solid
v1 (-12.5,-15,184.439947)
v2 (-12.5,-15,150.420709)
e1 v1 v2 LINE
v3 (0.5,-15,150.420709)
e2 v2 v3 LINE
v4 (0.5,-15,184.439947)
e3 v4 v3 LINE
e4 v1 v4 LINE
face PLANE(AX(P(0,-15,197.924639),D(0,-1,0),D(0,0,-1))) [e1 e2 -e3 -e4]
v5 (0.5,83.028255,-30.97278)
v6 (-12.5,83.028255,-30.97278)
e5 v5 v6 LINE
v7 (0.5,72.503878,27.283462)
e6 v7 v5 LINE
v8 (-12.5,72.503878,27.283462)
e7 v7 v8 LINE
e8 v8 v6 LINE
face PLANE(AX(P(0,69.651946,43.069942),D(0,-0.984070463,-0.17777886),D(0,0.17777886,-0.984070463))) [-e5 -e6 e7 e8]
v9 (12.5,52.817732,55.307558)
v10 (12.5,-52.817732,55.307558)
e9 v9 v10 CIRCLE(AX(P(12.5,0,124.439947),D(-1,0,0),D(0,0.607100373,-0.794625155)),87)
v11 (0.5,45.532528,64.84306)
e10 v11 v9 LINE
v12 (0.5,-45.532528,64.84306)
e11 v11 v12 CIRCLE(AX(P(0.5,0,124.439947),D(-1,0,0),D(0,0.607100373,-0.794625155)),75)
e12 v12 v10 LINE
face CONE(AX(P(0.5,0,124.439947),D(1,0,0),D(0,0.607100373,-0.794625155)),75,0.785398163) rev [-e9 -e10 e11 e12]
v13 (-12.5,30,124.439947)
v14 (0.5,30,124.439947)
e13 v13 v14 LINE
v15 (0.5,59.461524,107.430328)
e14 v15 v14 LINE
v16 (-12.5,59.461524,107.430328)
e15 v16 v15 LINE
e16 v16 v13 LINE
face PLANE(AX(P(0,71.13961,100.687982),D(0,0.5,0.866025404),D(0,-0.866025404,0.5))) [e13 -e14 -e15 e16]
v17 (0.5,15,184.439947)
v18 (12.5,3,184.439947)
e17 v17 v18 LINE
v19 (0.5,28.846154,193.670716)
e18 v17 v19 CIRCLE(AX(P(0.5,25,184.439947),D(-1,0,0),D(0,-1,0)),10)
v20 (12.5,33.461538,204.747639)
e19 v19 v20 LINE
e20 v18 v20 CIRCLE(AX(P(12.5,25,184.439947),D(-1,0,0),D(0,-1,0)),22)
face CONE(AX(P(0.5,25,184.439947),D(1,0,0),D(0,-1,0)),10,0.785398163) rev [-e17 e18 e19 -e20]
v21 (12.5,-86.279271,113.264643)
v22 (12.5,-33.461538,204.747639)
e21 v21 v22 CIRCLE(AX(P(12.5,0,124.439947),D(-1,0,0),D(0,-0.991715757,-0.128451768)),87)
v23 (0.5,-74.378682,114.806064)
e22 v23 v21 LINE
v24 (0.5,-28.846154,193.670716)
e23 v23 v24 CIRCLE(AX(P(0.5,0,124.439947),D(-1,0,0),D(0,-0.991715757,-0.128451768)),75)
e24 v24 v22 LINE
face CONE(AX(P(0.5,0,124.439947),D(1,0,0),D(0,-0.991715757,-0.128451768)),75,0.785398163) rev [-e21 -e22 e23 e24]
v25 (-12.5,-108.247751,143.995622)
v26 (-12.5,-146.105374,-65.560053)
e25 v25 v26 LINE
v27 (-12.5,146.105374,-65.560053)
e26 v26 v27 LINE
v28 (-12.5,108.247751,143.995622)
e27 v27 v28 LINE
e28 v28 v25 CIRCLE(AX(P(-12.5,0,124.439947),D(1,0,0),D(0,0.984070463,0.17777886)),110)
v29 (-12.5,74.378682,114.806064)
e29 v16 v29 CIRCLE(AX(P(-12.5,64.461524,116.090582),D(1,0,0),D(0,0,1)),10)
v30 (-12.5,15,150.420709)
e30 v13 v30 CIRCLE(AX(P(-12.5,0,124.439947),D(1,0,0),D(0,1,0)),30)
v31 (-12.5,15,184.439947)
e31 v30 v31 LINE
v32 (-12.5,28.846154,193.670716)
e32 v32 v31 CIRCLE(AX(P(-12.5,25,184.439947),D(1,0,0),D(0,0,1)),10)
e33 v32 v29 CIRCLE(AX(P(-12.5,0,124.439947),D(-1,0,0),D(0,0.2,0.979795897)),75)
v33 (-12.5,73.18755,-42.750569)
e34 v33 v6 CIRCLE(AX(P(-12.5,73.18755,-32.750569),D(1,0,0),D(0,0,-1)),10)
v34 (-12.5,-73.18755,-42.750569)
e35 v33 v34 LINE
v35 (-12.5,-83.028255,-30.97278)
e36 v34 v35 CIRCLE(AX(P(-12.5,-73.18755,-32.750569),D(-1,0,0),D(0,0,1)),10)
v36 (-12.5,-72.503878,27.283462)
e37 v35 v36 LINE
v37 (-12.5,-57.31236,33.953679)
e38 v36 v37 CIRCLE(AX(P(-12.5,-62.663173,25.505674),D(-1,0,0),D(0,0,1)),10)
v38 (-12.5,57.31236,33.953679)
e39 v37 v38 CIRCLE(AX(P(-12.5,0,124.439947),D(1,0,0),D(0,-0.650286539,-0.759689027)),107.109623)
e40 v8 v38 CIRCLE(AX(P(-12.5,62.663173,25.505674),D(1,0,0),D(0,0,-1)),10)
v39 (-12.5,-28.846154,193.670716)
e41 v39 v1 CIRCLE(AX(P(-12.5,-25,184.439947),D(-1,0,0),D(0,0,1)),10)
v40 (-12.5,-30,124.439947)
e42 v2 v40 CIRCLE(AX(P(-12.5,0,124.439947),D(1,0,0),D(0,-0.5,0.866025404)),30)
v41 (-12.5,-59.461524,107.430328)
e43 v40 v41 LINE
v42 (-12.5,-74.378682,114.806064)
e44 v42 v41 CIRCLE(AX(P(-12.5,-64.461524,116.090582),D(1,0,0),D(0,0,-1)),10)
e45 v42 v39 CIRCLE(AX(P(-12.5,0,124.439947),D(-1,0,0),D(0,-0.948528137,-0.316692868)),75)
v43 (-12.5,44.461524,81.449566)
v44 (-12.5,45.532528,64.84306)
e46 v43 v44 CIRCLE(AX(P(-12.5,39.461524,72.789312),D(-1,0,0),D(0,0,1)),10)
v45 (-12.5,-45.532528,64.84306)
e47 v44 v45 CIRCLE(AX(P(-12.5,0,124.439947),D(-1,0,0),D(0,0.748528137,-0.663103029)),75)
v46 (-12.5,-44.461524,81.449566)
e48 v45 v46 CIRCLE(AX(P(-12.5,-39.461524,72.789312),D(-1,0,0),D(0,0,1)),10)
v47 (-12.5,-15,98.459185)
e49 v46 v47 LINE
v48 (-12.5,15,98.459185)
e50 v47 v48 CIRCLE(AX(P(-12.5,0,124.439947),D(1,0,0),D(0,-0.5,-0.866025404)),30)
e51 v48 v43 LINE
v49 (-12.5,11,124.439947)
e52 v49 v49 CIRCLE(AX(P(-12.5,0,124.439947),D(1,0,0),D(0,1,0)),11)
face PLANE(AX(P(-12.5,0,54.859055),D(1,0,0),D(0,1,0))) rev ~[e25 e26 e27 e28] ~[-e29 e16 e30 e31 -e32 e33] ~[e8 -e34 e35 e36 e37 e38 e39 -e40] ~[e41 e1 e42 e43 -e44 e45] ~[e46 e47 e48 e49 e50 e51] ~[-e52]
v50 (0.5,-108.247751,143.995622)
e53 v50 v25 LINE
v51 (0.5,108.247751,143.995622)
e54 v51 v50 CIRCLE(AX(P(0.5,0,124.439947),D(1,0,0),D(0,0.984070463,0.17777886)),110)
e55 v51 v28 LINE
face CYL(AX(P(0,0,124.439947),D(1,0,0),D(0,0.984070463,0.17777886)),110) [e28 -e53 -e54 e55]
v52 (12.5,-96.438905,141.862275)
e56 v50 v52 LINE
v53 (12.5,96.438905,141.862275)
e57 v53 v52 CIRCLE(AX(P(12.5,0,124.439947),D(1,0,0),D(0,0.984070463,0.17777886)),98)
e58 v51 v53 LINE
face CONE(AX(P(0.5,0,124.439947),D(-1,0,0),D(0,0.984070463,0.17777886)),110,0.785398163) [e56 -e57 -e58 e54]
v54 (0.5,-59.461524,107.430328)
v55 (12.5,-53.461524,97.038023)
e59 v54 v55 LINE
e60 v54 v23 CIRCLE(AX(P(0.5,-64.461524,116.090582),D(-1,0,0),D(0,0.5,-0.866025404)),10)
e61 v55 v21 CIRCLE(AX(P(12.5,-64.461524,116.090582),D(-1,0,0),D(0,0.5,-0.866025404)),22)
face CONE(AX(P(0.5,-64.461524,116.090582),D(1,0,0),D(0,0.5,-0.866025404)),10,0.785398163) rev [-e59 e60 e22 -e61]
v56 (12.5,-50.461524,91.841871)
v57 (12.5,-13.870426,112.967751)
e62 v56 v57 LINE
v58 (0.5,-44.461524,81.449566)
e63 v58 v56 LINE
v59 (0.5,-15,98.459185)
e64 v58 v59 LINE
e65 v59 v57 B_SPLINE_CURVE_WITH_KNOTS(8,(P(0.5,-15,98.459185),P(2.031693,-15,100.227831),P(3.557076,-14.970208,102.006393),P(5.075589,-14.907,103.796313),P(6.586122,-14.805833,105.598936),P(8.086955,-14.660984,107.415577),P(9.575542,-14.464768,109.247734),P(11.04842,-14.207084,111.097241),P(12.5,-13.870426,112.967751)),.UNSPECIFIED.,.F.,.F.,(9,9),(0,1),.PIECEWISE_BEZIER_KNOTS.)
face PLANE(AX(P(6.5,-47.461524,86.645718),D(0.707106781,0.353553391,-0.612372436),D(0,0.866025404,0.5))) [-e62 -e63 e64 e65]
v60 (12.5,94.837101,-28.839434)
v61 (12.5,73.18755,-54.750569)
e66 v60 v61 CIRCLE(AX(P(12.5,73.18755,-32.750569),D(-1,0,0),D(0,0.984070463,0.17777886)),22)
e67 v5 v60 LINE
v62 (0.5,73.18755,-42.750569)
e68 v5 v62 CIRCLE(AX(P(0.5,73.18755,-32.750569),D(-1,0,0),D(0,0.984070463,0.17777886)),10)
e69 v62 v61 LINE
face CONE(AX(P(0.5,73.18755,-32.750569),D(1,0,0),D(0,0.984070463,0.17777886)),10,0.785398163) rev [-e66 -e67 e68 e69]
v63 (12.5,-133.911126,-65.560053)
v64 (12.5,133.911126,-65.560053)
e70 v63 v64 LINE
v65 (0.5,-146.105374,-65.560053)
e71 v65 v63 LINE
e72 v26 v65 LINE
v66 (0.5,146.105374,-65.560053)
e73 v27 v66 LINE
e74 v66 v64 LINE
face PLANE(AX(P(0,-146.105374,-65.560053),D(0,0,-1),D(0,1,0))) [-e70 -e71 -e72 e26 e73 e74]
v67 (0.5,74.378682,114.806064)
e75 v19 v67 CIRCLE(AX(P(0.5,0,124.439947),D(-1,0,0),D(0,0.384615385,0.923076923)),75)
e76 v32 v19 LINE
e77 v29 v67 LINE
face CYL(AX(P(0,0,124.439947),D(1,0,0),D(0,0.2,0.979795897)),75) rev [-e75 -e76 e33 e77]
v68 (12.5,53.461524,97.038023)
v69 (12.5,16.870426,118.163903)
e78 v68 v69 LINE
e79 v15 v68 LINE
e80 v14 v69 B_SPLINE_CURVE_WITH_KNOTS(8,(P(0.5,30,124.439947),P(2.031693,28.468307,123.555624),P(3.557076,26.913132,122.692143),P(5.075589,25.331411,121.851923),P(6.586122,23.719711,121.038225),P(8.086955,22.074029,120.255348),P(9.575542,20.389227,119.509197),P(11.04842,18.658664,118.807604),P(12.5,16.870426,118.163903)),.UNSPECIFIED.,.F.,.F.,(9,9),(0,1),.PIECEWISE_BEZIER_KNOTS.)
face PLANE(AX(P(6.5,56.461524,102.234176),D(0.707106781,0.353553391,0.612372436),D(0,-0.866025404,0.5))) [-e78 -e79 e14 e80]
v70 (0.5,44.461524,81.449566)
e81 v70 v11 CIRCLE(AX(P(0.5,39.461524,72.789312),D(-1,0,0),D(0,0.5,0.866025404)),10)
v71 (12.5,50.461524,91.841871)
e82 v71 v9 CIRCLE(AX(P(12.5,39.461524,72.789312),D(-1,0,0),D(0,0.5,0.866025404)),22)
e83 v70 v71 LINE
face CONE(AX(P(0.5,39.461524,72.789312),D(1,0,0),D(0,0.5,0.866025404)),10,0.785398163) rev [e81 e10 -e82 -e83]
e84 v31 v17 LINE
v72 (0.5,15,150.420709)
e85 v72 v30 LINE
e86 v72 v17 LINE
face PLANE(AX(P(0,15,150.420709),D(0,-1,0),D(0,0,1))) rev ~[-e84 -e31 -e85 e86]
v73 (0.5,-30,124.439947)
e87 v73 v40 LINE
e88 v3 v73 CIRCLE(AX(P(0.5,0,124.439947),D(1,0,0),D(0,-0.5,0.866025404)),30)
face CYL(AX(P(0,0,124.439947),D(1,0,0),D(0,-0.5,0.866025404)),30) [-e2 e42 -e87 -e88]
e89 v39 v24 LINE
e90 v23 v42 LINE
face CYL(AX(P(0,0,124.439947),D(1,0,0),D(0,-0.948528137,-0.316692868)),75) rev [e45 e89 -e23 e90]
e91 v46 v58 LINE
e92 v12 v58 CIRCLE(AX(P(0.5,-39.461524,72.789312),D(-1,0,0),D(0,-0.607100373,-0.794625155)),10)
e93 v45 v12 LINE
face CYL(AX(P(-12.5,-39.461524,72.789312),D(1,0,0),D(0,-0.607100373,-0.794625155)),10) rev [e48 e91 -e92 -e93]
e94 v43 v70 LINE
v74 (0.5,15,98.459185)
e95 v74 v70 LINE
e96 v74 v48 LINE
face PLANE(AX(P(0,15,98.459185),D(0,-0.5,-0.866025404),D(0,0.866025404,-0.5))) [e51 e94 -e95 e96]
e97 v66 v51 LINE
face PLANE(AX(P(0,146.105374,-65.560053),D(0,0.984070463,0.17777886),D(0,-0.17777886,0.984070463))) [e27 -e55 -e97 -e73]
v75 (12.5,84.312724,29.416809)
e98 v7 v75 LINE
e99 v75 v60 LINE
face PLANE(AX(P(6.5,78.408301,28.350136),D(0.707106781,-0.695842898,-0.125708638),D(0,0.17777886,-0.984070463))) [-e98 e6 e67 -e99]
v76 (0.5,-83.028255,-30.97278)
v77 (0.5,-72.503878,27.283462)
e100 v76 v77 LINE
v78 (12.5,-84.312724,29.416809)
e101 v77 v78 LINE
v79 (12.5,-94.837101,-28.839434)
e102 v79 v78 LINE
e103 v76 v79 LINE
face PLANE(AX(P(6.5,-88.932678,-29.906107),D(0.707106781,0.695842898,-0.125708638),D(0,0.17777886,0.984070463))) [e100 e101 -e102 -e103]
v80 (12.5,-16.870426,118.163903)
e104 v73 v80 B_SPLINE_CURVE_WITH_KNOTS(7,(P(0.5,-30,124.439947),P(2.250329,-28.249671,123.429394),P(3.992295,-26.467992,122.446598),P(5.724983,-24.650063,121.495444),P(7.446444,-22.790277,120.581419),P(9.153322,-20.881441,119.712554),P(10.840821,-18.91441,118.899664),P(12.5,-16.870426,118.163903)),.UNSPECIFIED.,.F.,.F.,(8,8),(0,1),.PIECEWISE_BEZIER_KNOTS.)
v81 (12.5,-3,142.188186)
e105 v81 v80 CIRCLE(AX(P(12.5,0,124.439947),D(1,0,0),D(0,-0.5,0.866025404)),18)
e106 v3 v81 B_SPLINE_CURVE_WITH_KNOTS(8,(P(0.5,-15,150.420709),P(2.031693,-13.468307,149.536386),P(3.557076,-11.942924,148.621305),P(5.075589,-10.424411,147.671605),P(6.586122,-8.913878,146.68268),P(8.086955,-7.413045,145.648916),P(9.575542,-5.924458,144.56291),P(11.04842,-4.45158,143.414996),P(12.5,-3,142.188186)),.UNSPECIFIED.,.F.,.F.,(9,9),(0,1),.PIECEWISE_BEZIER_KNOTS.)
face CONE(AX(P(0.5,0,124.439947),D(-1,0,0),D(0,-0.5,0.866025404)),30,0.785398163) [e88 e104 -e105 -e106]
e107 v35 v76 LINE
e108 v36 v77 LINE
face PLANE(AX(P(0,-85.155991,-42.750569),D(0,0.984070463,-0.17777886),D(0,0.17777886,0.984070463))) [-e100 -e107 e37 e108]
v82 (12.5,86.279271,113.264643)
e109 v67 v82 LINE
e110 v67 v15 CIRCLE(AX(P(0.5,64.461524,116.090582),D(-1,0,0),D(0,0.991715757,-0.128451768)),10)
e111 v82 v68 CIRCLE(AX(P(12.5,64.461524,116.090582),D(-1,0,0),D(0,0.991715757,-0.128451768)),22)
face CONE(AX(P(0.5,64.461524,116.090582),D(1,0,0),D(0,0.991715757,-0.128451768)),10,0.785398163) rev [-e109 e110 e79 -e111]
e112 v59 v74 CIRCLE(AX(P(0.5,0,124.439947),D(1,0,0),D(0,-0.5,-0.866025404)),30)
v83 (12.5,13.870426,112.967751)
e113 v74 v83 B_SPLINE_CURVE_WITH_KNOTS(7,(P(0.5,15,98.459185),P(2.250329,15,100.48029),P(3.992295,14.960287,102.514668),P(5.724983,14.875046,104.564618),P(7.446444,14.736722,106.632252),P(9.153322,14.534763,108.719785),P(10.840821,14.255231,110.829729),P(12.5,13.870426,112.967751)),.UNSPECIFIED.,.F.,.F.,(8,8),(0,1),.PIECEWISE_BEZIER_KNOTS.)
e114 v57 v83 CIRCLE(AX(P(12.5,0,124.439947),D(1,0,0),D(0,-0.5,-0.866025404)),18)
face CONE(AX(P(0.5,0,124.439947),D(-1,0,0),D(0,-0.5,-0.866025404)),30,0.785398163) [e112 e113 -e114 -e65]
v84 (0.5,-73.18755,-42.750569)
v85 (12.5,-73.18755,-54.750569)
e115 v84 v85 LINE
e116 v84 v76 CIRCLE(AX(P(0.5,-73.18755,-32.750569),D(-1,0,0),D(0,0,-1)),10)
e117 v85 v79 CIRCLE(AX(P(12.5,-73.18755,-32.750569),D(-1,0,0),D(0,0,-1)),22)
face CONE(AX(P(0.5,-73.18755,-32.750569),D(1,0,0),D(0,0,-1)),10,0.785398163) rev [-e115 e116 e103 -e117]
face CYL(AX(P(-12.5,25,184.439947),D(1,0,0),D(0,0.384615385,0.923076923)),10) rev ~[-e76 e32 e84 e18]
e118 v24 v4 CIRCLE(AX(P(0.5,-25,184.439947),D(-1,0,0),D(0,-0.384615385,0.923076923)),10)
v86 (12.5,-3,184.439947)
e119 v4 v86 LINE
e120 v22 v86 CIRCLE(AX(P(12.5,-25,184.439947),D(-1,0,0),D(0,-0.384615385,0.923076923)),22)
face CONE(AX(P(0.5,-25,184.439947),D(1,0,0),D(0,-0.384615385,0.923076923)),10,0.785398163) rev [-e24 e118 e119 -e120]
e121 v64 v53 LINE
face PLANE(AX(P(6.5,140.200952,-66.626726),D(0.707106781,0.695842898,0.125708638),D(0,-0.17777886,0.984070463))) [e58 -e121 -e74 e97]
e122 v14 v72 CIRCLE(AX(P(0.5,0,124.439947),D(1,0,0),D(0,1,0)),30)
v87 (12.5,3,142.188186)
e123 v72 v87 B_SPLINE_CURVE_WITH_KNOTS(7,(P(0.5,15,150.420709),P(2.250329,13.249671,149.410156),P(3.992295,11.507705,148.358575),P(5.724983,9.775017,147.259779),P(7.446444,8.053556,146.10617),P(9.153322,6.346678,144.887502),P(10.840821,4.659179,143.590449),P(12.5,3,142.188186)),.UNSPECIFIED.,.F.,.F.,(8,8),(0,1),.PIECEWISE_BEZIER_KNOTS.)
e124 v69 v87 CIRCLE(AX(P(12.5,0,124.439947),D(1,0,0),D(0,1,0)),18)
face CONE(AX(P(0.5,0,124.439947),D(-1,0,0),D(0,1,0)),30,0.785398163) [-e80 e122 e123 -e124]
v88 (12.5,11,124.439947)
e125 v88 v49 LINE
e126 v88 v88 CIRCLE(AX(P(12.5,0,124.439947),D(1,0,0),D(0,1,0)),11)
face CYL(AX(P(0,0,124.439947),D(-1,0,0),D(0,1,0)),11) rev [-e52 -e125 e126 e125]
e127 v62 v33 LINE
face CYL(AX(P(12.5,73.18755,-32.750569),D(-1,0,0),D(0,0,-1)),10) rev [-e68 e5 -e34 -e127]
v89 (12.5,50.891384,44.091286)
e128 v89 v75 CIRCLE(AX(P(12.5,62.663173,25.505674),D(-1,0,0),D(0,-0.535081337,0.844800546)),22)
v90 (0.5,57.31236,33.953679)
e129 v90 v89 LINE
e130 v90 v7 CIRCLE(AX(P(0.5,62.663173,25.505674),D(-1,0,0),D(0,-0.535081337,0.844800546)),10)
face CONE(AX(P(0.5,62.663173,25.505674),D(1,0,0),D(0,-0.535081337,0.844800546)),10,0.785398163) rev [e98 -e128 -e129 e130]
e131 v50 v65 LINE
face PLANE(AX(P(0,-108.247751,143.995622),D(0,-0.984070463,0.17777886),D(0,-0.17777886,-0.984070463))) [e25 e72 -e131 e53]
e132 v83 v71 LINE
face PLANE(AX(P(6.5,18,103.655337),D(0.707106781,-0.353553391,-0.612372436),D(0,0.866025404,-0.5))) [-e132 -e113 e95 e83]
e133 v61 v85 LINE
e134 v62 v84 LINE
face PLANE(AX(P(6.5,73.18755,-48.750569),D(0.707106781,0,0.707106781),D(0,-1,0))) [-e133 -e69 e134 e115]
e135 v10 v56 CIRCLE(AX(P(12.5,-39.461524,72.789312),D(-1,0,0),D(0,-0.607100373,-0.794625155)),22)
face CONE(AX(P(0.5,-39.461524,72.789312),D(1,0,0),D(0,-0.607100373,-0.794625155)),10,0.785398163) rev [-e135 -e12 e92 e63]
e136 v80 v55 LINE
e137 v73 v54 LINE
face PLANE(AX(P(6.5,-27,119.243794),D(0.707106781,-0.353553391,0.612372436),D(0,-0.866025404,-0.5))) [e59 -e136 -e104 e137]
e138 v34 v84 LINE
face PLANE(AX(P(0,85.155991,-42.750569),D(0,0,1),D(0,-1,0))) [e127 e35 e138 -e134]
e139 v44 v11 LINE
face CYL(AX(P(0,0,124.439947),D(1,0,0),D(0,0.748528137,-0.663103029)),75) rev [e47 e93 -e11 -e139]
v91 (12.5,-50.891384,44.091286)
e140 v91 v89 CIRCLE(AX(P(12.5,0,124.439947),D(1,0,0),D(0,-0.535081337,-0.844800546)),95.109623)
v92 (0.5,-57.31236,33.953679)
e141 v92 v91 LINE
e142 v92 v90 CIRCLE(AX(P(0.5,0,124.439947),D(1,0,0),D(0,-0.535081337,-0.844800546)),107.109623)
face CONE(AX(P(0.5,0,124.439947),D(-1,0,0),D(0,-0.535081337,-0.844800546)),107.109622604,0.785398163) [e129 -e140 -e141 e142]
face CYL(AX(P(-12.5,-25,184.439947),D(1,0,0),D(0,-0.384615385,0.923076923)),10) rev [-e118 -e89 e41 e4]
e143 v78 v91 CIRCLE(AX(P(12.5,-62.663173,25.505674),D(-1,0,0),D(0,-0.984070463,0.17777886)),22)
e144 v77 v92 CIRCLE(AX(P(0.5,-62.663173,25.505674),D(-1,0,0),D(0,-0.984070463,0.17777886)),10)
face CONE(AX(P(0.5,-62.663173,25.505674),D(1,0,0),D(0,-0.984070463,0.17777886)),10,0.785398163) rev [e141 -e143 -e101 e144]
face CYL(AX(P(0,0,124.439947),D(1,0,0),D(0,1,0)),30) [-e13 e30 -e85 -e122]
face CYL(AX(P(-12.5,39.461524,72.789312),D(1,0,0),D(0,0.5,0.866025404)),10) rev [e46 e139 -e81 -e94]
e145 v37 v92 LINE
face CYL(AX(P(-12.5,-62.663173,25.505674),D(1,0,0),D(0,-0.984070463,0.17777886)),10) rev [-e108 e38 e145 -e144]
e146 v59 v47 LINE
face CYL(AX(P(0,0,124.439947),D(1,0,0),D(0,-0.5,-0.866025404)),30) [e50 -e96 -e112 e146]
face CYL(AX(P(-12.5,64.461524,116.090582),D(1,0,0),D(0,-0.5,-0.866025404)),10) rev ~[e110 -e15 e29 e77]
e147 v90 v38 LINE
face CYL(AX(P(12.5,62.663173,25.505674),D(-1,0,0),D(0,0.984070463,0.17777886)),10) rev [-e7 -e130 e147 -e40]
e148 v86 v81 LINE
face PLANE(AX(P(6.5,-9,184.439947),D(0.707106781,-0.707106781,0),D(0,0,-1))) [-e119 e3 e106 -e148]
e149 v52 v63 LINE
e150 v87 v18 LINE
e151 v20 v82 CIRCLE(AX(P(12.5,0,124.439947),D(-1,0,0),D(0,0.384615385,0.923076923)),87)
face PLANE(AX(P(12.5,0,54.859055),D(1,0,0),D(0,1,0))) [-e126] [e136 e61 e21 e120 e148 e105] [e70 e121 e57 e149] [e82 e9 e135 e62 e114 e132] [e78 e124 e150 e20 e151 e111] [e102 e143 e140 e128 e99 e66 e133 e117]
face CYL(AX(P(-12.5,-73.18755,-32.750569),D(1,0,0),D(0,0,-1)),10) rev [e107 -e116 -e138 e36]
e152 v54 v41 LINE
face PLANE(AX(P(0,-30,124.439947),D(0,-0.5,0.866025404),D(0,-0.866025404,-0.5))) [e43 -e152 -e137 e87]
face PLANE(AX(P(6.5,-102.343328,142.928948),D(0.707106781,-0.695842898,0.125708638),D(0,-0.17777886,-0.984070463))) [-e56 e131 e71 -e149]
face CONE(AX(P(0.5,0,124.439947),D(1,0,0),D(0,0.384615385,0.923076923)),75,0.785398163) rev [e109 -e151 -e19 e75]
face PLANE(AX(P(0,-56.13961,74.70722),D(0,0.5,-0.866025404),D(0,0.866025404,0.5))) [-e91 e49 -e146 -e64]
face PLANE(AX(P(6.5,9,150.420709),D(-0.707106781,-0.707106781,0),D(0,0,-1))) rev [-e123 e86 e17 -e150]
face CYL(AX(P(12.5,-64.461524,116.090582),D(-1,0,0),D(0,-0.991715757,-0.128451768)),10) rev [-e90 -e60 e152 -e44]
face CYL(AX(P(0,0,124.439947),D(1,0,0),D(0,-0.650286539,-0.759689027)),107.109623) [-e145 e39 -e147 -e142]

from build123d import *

# Parameters (mm, degrees)
F0_R     = 11
F1_DEPTH = 12.5
F2_SIZE  = 12
F3_R     = 10
F4_SIZE  = 12


# Not quite as in the source:
# - a feature names something its author has since deleted; it is built from what else it names


with BuildPart() as f1:
    # F0 (on Right) → F1 (new body, symmetric)
    with BuildSketch(Plane.YZ):
        with BuildLine():
            Line((-108.2477509669, 143.9956215311), (-146.1053743867, -65.5600531085))
            Line((-146.1053743867, -65.5600531085), (0, -65.5600531085))
            Line((0, -65.5600531085), (146.1053743867, -65.5600531085))
            Line((146.1053743867, -65.5600531085), (108.2477509669, 143.9956215311))
            ThreePointArc((108.2477509669, 143.9956215311), (0, 234.4399468915), (-108.2477509669, 143.9956215311))
        make_face()
        with BuildLine():
            Line((-85.1559906377, -42.7505690663), (-69.6519457463, 43.0699419263))
            ThreePointArc((-69.6519457463, 43.0699419263), (0, 17.3303242879), (69.6519457463, 43.0699419263))
            Line((69.6519457463, 43.0699419263), (85.1559906377, -42.7505690663))
            Line((85.1559906377, -42.7505690663), (0, -42.7505690663))
            Line((0, -42.7505690663), (-85.1559906377, -42.7505690663))
        make_face(mode=Mode.SUBTRACT)
        with BuildLine():
            ThreePointArc((56.1396103068, 74.707219693), (0, 49.4399468915), (-56.1396103068, 74.707219693))
            Line((-56.1396103068, 74.707219693), (-15, 98.459184778))
            ThreePointArc((-15, 98.459184778), (0, 94.4399468915), (15, 98.459184778))
            Line((15, 98.459184778), (56.1396103068, 74.707219693))
        make_face(mode=Mode.SUBTRACT)
        with BuildLine():
            Line((-15, 197.924639175), (-15, 150.420709005))
            ThreePointArc((-15, 150.420709005), (-25.9807621135, 139.4399468915), (-30, 124.4399468915))
            Line((-30, 124.4399468915), (-71.1396103068, 100.6879818065))
            ThreePointArc((-71.1396103068, 100.6879818065), (-64.9519052838, 161.9399468915), (-15, 197.924639175))
        make_face(mode=Mode.SUBTRACT)
        with Locations((0, 124.4399468915)):
            Circle(F0_R, mode=Mode.SUBTRACT)
        with BuildLine():
            Line((15, 150.420709005), (15, 197.924639175))
            ThreePointArc((15, 197.924639175), (64.9519052838, 161.9399468915), (71.1396103068, 100.6879818065))
            Line((71.1396103068, 100.6879818065), (30, 124.4399468915))
            ThreePointArc((30, 124.4399468915), (25.9807621135, 139.4399468915), (15, 150.420709005))
        make_face(mode=Mode.SUBTRACT)
    extrude(amount=F1_DEPTH, both=True)

    # F2
    f2_edges = [f1.edges().sort_by_distance(p)[0] for p in [
        (12.5, 0, 234.439947),
    ]]
    chamfer(f2_edges, length=F2_SIZE)

    # F3
    f3_edges = [f1.edges().sort_by_distance(p)[0] for p in [
        (0, -69.651946, 43.069942),
        (0, 69.651946, 43.069942),
        (0, -85.155991, -42.750569),
        (0, 85.155991, -42.750569),
        (0, -15, 197.924639),
        (0, 15, 197.924639),
        (0, -71.13961, 100.687982),
        (0, -56.13961, 74.70722),
        (0, 56.13961, 74.70722),
        (0, 71.13961, 100.687982),
    ]]
    fillet(f3_edges, radius=F3_R)

    # F4
    f4_edges = [f1.edges().sort_by_distance(p)[0] for p in [
        (12.5, 0, 17.330324),
        (12.5, -64.951905, 161.939947),
        (12.5, 64.951905, 161.939947),
        (12.5, 0, 49.439947),
        (12.5, -25.980762, 139.439947),
        (12.5, 0, 94.439947),
        (12.5, 25.980762, 139.439947),
    ]]
    chamfer(f4_edges, length=F4_SIZE)


solid = f1.part
